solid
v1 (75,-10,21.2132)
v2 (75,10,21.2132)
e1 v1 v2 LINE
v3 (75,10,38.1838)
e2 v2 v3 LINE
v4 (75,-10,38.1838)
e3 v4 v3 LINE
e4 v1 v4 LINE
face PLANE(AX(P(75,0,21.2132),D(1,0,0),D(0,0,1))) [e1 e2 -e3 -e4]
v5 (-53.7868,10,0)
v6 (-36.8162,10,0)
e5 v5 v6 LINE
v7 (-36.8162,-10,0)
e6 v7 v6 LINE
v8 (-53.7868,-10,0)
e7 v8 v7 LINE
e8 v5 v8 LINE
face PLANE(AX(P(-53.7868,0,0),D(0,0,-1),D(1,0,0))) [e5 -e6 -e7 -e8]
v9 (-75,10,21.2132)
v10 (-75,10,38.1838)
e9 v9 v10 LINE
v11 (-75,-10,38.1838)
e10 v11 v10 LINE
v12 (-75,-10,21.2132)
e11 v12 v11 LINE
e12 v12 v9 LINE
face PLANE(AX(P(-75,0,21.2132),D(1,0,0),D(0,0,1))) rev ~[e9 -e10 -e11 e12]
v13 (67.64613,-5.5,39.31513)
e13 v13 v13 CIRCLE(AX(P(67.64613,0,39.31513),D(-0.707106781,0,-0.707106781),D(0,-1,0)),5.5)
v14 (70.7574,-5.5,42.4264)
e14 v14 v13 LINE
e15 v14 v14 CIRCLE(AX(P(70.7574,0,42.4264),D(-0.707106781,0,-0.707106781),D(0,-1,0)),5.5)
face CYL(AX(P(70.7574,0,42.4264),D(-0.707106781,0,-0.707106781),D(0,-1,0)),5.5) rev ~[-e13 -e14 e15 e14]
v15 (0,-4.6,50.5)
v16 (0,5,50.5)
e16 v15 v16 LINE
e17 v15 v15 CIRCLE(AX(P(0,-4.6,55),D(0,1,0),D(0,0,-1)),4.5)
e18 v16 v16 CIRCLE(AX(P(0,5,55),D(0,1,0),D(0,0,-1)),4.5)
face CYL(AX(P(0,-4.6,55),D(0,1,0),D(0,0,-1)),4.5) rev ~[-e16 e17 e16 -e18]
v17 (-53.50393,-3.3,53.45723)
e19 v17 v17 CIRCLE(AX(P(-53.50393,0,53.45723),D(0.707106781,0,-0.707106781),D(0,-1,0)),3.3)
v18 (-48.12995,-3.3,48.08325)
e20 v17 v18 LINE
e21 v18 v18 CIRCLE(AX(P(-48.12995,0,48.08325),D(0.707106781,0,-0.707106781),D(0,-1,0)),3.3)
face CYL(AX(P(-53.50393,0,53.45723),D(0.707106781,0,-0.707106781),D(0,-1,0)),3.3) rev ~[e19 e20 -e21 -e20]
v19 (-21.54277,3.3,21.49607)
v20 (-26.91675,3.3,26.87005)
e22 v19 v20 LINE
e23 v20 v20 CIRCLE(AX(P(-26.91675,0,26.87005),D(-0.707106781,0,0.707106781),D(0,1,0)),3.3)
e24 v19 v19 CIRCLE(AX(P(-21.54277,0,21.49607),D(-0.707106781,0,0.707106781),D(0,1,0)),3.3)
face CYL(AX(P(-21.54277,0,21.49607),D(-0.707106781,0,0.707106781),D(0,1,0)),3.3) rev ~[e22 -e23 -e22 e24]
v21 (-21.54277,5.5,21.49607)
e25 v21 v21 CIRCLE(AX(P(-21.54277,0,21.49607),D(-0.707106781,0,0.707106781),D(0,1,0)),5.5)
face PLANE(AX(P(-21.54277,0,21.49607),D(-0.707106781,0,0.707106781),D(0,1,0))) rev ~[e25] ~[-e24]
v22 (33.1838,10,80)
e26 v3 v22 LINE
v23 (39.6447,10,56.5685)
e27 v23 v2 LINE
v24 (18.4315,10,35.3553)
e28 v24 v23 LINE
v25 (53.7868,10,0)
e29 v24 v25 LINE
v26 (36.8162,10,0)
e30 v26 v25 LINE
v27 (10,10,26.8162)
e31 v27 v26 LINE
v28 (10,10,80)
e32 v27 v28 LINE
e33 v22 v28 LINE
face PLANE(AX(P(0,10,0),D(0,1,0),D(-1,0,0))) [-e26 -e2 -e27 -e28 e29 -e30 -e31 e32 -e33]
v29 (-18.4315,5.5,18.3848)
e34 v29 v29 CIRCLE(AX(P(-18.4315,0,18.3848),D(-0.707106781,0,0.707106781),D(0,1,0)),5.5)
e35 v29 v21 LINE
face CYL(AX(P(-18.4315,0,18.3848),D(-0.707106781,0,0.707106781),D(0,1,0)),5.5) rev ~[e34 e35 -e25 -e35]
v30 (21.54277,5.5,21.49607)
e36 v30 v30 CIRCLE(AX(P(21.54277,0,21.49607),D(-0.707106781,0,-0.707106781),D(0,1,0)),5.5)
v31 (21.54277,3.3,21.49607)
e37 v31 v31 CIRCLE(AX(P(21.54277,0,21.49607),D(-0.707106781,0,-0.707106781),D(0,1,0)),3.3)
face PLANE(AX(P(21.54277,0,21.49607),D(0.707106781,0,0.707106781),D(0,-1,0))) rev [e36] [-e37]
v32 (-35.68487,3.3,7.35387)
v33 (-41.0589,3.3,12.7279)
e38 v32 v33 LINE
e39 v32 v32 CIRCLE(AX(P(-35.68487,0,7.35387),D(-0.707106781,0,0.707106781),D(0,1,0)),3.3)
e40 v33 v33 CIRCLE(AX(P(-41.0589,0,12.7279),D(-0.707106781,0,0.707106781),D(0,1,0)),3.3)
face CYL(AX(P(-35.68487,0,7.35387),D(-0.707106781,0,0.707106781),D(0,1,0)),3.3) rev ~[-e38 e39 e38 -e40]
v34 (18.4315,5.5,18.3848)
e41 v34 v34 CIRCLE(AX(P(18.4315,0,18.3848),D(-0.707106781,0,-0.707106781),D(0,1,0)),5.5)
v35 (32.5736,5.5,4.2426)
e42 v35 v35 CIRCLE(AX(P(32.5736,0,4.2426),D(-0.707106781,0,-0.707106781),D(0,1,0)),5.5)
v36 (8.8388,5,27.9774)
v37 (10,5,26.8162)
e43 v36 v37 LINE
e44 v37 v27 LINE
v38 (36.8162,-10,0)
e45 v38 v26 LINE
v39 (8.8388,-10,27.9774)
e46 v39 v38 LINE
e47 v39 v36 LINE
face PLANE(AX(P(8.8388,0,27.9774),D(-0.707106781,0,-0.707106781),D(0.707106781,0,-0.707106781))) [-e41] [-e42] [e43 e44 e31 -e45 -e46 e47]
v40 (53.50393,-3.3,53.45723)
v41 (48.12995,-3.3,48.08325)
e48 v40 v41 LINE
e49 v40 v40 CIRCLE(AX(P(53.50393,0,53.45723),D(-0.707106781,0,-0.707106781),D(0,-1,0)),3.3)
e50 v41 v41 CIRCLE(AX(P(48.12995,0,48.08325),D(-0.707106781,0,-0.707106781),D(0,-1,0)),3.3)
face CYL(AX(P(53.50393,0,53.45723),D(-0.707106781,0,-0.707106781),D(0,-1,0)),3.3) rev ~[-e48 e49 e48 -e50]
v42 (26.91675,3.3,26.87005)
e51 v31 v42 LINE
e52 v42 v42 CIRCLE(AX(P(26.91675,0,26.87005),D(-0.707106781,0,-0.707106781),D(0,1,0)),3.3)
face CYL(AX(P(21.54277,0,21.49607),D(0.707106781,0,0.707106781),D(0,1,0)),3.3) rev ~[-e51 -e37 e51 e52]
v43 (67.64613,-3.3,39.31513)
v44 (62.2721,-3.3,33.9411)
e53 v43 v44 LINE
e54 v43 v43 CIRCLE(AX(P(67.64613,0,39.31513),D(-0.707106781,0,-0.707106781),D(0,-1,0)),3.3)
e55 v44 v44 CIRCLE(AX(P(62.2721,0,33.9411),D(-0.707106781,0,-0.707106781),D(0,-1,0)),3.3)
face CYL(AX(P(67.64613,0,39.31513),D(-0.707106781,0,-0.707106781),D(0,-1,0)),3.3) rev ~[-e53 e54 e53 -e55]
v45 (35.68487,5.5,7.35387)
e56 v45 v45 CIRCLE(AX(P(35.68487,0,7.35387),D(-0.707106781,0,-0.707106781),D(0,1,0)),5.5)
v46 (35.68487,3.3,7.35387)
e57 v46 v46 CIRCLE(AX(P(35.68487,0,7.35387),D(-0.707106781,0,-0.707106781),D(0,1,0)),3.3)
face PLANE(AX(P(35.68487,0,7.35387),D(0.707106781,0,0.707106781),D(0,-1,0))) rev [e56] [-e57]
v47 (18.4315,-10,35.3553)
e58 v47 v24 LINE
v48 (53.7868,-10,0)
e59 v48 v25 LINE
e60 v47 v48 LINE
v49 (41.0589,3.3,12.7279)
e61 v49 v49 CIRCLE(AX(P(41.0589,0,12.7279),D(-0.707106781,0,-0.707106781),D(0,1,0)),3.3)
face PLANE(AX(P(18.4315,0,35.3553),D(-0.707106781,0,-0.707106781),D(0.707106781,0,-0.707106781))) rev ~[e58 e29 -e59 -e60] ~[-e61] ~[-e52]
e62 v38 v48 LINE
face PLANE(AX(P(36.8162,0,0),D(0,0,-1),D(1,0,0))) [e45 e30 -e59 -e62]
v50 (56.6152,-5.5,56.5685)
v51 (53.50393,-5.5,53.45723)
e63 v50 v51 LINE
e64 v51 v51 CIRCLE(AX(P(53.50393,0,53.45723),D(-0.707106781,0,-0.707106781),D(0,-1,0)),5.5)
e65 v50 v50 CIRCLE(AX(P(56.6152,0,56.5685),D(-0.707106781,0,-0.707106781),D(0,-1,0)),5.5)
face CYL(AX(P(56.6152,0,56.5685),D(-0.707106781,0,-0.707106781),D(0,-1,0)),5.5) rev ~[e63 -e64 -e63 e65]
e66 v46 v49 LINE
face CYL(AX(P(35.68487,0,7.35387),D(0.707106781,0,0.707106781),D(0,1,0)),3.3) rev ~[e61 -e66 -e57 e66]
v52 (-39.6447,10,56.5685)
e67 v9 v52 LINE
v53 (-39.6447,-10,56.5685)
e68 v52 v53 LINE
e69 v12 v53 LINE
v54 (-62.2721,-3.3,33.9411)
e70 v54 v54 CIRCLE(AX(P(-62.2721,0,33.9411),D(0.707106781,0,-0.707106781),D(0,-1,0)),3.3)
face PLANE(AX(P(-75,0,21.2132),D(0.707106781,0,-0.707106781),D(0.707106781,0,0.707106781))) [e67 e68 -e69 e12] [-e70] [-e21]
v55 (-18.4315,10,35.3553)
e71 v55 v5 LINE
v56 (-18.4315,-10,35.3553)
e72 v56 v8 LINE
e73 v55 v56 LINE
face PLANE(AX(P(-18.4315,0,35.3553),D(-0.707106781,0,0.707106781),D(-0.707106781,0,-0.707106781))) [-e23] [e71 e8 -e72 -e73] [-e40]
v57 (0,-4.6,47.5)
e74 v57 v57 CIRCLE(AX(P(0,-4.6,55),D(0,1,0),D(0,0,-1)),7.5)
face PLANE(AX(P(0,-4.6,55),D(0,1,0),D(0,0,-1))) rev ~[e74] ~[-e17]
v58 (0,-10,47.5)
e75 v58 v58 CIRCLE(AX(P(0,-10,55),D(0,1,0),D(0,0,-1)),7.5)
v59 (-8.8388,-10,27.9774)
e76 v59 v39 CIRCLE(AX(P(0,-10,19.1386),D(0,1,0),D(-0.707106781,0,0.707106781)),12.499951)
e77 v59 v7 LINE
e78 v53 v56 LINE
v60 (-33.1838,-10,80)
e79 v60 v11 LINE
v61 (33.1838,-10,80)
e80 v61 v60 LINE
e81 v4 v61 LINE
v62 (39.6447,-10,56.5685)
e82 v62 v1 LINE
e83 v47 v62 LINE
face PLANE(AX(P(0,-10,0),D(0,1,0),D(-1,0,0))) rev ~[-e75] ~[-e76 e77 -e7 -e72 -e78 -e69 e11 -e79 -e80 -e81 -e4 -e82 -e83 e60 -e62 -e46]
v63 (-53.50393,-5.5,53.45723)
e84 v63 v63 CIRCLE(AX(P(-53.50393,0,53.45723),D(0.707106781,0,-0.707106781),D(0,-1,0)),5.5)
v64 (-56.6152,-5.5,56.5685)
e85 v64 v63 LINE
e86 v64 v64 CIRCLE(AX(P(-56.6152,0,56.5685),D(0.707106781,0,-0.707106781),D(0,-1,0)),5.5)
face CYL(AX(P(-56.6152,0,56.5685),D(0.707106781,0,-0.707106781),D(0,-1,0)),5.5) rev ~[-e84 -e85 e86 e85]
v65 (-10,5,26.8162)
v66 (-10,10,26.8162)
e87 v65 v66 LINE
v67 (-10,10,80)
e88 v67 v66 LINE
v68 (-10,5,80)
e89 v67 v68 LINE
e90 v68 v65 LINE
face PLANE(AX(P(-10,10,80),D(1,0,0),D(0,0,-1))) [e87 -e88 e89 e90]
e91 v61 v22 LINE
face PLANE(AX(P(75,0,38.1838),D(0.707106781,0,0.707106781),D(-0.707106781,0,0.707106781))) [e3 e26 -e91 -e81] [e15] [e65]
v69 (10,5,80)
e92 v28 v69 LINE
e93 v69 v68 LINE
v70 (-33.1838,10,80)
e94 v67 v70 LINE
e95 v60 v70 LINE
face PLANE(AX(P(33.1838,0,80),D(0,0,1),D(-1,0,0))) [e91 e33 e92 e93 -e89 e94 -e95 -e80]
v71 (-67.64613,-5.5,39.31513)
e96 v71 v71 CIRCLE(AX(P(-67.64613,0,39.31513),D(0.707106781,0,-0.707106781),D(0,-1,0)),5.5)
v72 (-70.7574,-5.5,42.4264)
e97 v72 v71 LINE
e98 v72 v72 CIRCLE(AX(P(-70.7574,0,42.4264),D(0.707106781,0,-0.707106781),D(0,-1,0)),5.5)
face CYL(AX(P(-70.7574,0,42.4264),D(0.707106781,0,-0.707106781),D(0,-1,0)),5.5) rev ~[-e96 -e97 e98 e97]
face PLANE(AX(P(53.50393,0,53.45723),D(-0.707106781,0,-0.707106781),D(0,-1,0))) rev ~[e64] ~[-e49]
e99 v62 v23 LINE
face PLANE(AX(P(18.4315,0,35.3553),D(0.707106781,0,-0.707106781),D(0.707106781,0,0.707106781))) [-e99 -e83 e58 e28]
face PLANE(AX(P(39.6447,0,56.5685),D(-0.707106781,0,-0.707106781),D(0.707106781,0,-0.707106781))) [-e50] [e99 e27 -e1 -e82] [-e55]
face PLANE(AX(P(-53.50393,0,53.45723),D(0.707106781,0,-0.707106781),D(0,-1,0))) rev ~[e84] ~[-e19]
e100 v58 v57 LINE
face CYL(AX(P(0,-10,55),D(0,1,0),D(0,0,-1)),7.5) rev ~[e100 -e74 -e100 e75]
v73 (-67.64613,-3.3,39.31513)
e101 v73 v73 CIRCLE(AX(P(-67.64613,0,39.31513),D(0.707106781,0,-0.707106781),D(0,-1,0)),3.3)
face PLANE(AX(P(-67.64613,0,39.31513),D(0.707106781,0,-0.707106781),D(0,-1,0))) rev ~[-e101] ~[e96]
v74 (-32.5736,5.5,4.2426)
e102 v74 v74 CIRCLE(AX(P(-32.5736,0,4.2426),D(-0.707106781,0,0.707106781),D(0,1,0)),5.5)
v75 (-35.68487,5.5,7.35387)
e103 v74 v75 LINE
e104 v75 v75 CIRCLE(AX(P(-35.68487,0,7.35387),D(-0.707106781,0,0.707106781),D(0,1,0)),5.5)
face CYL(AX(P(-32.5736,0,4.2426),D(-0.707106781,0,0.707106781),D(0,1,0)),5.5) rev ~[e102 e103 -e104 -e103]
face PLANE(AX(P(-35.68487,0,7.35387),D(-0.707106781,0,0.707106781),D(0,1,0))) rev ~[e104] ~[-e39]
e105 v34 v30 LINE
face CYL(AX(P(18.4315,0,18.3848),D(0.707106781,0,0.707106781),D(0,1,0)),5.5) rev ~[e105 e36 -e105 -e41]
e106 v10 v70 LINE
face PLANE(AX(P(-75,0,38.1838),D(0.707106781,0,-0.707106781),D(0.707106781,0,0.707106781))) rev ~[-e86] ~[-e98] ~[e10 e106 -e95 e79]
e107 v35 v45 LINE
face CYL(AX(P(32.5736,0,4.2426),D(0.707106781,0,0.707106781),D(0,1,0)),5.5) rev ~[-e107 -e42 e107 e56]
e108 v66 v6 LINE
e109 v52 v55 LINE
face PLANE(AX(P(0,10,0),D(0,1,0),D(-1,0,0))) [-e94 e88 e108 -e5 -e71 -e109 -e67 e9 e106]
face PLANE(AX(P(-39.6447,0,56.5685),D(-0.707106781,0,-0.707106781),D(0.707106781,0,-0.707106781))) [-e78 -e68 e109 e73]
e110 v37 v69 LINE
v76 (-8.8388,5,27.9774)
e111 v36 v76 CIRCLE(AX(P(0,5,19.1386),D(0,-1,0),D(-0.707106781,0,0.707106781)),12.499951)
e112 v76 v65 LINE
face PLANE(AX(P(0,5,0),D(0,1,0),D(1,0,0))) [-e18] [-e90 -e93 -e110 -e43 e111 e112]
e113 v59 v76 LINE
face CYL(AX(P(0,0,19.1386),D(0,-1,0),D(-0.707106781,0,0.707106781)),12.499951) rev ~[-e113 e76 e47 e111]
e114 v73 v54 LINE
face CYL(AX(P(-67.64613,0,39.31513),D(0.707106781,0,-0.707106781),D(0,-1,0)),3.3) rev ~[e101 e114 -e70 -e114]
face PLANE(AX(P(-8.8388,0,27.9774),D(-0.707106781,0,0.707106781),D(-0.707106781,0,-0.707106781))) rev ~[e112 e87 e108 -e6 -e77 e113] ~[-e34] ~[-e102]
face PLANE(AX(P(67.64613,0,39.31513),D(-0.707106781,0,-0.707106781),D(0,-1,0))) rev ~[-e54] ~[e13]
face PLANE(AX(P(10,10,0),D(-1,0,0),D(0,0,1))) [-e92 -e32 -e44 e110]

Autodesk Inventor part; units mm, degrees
ref_plane "YZ Plane" through (0, 0, 0) normal (1, 0, 0) x (0, 1, 0)
ref_plane "XZ Plane" through (0, 0, 0) normal (0, 1, 0) x (-1, 0, 0)
sketch "Skizze1" plane through (0, 0, 0) normal (0, 1, 0) x (-1, 0, 0)
  line L0 (75, 0) -> (-5, 80) construction
  line L1 (5, 80) -> (-75, 0) construction
  line L2 (75, 21.2132) -> (39.6447, 56.5685)
  line L3 (39.6447, 56.5685) -> (18.4315, 35.3553)
  line L4 (18.4315, 35.3553) -> (53.7868, 0)
  line L5 (-18.4315, 35.3553) -> (-39.6447, 56.5685)
  line L6 (-39.6447, 56.5685) -> (-75, 21.2132)
  line L7 (-18.4315, 35.3553) -> (-53.7868, 0)
  line L8 (75, 38.1838) -> (33.1838, 80)
  line L9 (-75, 38.1838) -> (-33.1838, 80)
  line L10 (8.8388, 27.9774) -> (36.8162, 0)
  line L11 (-8.8388, 27.9774) -> (-36.8162, 0)
  arc A0 (8.8388, 27.9774) -> (-8.8388, 27.9774) centre (0, 19.1386) ccw
  line L12 (-33.1838, 80) -> (33.1838, 80)
  line L13 (53.7868, 0) -> (36.8162, 0)
  line L14 (-36.8162, 0) -> (-53.7868, 0)
  line L15 (-75, 21.2132) -> (-75, 38.1838)
  line L16 (75, 21.2132) -> (75, 38.1838)
  line L17 (0, -16) -> (0, 96) construction
  line L18 (-105, 0) -> (105, 0) construction
  line L19 (39.6447, 56.5685) -> (48.1299, 65.0538)
  point P0 (0, 36.8162)
  point P1 (0, 0)
  dimension "d11" = 30
  dimension "d12" = 50
  dimension "d16" = 12
  dimension "d17" = 12
  dimension "d18" = 12.5
  dimension "d19" = 80
  dimension "d20" = 150
  dimension "d21" = 45
extrude "Grundkörper" add sketch "Skizze1" along normal mid plane 20
sketch "Skizze2" plane through (0, 10, 0) normal (0, 1, 0) x (1, 0, 0)
  line L0 (0, 16) -> (0, -96) construction
  line L1 (-33.1838, -80) -> (33.1838, -80) construction
  line L2 (105, 0) -> (-105, 0) construction
  line L3 (10, -80) -> (-10, -80)
  line L4 (-10, -80) -> (-10, 0)
  line L5 (-10, 0) -> (10, 0)
  line L6 (10, 0) -> (10, -80)
  point P0 (0, 0)
  dimension "d25" = 20
extrude "NUT" cut sketch "Skizze2" against normal blind 5
sketch "Skizze4" plane through (0, -10, 0) normal (0, -1, 0) x (1, 0, 0)
  line L0 (0, 96) -> (0, -16) construction
  line L1 (33.1838, 80) -> (-33.1838, 80) construction
  point P0 (0, 0)
  point P1 (0, 55)
  dimension "d29" = 25
hole "DIN7984_M8_Bohrung" at (0, -10, 55) direction (0, 1, 0) diameter 9 end through all counterbore diameter 15 counterbore depth 5.4
ref_plane "Arbeitsebene_Bohrung" through (-29.0381, -10, 45.9619) normal (-0.7071068, 0, 0.7071068) x (0.7071068, 0, 0.7071068)
sketch "Skizze5" plane through (-33.1838, -10, 80) normal (-0.7071068, 0, 0.7071068) x (0.7071068, 0, 0.7071068)
  line L0 (-21.1371, 20) -> (-21.1371, 0) construction
  line L1 (-59.1371, 20) -> (-59.1371, 0) construction
  line L2 (-125.864, 10) -> (110.2244, 10) construction
  line L3 (-71.1371, 0) -> (-71.1371, 20) projected
  point P0 (-33.1041, 10)
  point P1 (-33.1371, 10)
  point P2 (-53.1371, 10)
  dimension "d37" = 20
  dimension "d39" = 18
hole "DIN7984_M6_Bohrung" at (-56.6152, 0, 56.5685) at (-70.7574, 0, 42.4264) direction (0.7071068, 0, -0.7071068) diameter 6.6 end up to surface counterbore diameter 11 counterbore depth 4.4
mirror "DIN7984_M6_Bohrung_Spiegelung:1" about plane through (-29.0381, -10, 45.9619) normal (-0.7071068, 0, 0.7071068) of "DIN7984_M6_Bohrung"
mirror "DIN7984_M6_Bohrung_Spiegelung:2" about plane through (0, 0, 0) normal (1, 0, 0) of "DIN7984_M6_Bohrung", "DIN7984_M6_Bohrung_Spiegelung:1"
equation "\"d17\" = d16"
properties part number "200-20-ROCKER-CONNECTOR-03" material "Aluminium 6061"
